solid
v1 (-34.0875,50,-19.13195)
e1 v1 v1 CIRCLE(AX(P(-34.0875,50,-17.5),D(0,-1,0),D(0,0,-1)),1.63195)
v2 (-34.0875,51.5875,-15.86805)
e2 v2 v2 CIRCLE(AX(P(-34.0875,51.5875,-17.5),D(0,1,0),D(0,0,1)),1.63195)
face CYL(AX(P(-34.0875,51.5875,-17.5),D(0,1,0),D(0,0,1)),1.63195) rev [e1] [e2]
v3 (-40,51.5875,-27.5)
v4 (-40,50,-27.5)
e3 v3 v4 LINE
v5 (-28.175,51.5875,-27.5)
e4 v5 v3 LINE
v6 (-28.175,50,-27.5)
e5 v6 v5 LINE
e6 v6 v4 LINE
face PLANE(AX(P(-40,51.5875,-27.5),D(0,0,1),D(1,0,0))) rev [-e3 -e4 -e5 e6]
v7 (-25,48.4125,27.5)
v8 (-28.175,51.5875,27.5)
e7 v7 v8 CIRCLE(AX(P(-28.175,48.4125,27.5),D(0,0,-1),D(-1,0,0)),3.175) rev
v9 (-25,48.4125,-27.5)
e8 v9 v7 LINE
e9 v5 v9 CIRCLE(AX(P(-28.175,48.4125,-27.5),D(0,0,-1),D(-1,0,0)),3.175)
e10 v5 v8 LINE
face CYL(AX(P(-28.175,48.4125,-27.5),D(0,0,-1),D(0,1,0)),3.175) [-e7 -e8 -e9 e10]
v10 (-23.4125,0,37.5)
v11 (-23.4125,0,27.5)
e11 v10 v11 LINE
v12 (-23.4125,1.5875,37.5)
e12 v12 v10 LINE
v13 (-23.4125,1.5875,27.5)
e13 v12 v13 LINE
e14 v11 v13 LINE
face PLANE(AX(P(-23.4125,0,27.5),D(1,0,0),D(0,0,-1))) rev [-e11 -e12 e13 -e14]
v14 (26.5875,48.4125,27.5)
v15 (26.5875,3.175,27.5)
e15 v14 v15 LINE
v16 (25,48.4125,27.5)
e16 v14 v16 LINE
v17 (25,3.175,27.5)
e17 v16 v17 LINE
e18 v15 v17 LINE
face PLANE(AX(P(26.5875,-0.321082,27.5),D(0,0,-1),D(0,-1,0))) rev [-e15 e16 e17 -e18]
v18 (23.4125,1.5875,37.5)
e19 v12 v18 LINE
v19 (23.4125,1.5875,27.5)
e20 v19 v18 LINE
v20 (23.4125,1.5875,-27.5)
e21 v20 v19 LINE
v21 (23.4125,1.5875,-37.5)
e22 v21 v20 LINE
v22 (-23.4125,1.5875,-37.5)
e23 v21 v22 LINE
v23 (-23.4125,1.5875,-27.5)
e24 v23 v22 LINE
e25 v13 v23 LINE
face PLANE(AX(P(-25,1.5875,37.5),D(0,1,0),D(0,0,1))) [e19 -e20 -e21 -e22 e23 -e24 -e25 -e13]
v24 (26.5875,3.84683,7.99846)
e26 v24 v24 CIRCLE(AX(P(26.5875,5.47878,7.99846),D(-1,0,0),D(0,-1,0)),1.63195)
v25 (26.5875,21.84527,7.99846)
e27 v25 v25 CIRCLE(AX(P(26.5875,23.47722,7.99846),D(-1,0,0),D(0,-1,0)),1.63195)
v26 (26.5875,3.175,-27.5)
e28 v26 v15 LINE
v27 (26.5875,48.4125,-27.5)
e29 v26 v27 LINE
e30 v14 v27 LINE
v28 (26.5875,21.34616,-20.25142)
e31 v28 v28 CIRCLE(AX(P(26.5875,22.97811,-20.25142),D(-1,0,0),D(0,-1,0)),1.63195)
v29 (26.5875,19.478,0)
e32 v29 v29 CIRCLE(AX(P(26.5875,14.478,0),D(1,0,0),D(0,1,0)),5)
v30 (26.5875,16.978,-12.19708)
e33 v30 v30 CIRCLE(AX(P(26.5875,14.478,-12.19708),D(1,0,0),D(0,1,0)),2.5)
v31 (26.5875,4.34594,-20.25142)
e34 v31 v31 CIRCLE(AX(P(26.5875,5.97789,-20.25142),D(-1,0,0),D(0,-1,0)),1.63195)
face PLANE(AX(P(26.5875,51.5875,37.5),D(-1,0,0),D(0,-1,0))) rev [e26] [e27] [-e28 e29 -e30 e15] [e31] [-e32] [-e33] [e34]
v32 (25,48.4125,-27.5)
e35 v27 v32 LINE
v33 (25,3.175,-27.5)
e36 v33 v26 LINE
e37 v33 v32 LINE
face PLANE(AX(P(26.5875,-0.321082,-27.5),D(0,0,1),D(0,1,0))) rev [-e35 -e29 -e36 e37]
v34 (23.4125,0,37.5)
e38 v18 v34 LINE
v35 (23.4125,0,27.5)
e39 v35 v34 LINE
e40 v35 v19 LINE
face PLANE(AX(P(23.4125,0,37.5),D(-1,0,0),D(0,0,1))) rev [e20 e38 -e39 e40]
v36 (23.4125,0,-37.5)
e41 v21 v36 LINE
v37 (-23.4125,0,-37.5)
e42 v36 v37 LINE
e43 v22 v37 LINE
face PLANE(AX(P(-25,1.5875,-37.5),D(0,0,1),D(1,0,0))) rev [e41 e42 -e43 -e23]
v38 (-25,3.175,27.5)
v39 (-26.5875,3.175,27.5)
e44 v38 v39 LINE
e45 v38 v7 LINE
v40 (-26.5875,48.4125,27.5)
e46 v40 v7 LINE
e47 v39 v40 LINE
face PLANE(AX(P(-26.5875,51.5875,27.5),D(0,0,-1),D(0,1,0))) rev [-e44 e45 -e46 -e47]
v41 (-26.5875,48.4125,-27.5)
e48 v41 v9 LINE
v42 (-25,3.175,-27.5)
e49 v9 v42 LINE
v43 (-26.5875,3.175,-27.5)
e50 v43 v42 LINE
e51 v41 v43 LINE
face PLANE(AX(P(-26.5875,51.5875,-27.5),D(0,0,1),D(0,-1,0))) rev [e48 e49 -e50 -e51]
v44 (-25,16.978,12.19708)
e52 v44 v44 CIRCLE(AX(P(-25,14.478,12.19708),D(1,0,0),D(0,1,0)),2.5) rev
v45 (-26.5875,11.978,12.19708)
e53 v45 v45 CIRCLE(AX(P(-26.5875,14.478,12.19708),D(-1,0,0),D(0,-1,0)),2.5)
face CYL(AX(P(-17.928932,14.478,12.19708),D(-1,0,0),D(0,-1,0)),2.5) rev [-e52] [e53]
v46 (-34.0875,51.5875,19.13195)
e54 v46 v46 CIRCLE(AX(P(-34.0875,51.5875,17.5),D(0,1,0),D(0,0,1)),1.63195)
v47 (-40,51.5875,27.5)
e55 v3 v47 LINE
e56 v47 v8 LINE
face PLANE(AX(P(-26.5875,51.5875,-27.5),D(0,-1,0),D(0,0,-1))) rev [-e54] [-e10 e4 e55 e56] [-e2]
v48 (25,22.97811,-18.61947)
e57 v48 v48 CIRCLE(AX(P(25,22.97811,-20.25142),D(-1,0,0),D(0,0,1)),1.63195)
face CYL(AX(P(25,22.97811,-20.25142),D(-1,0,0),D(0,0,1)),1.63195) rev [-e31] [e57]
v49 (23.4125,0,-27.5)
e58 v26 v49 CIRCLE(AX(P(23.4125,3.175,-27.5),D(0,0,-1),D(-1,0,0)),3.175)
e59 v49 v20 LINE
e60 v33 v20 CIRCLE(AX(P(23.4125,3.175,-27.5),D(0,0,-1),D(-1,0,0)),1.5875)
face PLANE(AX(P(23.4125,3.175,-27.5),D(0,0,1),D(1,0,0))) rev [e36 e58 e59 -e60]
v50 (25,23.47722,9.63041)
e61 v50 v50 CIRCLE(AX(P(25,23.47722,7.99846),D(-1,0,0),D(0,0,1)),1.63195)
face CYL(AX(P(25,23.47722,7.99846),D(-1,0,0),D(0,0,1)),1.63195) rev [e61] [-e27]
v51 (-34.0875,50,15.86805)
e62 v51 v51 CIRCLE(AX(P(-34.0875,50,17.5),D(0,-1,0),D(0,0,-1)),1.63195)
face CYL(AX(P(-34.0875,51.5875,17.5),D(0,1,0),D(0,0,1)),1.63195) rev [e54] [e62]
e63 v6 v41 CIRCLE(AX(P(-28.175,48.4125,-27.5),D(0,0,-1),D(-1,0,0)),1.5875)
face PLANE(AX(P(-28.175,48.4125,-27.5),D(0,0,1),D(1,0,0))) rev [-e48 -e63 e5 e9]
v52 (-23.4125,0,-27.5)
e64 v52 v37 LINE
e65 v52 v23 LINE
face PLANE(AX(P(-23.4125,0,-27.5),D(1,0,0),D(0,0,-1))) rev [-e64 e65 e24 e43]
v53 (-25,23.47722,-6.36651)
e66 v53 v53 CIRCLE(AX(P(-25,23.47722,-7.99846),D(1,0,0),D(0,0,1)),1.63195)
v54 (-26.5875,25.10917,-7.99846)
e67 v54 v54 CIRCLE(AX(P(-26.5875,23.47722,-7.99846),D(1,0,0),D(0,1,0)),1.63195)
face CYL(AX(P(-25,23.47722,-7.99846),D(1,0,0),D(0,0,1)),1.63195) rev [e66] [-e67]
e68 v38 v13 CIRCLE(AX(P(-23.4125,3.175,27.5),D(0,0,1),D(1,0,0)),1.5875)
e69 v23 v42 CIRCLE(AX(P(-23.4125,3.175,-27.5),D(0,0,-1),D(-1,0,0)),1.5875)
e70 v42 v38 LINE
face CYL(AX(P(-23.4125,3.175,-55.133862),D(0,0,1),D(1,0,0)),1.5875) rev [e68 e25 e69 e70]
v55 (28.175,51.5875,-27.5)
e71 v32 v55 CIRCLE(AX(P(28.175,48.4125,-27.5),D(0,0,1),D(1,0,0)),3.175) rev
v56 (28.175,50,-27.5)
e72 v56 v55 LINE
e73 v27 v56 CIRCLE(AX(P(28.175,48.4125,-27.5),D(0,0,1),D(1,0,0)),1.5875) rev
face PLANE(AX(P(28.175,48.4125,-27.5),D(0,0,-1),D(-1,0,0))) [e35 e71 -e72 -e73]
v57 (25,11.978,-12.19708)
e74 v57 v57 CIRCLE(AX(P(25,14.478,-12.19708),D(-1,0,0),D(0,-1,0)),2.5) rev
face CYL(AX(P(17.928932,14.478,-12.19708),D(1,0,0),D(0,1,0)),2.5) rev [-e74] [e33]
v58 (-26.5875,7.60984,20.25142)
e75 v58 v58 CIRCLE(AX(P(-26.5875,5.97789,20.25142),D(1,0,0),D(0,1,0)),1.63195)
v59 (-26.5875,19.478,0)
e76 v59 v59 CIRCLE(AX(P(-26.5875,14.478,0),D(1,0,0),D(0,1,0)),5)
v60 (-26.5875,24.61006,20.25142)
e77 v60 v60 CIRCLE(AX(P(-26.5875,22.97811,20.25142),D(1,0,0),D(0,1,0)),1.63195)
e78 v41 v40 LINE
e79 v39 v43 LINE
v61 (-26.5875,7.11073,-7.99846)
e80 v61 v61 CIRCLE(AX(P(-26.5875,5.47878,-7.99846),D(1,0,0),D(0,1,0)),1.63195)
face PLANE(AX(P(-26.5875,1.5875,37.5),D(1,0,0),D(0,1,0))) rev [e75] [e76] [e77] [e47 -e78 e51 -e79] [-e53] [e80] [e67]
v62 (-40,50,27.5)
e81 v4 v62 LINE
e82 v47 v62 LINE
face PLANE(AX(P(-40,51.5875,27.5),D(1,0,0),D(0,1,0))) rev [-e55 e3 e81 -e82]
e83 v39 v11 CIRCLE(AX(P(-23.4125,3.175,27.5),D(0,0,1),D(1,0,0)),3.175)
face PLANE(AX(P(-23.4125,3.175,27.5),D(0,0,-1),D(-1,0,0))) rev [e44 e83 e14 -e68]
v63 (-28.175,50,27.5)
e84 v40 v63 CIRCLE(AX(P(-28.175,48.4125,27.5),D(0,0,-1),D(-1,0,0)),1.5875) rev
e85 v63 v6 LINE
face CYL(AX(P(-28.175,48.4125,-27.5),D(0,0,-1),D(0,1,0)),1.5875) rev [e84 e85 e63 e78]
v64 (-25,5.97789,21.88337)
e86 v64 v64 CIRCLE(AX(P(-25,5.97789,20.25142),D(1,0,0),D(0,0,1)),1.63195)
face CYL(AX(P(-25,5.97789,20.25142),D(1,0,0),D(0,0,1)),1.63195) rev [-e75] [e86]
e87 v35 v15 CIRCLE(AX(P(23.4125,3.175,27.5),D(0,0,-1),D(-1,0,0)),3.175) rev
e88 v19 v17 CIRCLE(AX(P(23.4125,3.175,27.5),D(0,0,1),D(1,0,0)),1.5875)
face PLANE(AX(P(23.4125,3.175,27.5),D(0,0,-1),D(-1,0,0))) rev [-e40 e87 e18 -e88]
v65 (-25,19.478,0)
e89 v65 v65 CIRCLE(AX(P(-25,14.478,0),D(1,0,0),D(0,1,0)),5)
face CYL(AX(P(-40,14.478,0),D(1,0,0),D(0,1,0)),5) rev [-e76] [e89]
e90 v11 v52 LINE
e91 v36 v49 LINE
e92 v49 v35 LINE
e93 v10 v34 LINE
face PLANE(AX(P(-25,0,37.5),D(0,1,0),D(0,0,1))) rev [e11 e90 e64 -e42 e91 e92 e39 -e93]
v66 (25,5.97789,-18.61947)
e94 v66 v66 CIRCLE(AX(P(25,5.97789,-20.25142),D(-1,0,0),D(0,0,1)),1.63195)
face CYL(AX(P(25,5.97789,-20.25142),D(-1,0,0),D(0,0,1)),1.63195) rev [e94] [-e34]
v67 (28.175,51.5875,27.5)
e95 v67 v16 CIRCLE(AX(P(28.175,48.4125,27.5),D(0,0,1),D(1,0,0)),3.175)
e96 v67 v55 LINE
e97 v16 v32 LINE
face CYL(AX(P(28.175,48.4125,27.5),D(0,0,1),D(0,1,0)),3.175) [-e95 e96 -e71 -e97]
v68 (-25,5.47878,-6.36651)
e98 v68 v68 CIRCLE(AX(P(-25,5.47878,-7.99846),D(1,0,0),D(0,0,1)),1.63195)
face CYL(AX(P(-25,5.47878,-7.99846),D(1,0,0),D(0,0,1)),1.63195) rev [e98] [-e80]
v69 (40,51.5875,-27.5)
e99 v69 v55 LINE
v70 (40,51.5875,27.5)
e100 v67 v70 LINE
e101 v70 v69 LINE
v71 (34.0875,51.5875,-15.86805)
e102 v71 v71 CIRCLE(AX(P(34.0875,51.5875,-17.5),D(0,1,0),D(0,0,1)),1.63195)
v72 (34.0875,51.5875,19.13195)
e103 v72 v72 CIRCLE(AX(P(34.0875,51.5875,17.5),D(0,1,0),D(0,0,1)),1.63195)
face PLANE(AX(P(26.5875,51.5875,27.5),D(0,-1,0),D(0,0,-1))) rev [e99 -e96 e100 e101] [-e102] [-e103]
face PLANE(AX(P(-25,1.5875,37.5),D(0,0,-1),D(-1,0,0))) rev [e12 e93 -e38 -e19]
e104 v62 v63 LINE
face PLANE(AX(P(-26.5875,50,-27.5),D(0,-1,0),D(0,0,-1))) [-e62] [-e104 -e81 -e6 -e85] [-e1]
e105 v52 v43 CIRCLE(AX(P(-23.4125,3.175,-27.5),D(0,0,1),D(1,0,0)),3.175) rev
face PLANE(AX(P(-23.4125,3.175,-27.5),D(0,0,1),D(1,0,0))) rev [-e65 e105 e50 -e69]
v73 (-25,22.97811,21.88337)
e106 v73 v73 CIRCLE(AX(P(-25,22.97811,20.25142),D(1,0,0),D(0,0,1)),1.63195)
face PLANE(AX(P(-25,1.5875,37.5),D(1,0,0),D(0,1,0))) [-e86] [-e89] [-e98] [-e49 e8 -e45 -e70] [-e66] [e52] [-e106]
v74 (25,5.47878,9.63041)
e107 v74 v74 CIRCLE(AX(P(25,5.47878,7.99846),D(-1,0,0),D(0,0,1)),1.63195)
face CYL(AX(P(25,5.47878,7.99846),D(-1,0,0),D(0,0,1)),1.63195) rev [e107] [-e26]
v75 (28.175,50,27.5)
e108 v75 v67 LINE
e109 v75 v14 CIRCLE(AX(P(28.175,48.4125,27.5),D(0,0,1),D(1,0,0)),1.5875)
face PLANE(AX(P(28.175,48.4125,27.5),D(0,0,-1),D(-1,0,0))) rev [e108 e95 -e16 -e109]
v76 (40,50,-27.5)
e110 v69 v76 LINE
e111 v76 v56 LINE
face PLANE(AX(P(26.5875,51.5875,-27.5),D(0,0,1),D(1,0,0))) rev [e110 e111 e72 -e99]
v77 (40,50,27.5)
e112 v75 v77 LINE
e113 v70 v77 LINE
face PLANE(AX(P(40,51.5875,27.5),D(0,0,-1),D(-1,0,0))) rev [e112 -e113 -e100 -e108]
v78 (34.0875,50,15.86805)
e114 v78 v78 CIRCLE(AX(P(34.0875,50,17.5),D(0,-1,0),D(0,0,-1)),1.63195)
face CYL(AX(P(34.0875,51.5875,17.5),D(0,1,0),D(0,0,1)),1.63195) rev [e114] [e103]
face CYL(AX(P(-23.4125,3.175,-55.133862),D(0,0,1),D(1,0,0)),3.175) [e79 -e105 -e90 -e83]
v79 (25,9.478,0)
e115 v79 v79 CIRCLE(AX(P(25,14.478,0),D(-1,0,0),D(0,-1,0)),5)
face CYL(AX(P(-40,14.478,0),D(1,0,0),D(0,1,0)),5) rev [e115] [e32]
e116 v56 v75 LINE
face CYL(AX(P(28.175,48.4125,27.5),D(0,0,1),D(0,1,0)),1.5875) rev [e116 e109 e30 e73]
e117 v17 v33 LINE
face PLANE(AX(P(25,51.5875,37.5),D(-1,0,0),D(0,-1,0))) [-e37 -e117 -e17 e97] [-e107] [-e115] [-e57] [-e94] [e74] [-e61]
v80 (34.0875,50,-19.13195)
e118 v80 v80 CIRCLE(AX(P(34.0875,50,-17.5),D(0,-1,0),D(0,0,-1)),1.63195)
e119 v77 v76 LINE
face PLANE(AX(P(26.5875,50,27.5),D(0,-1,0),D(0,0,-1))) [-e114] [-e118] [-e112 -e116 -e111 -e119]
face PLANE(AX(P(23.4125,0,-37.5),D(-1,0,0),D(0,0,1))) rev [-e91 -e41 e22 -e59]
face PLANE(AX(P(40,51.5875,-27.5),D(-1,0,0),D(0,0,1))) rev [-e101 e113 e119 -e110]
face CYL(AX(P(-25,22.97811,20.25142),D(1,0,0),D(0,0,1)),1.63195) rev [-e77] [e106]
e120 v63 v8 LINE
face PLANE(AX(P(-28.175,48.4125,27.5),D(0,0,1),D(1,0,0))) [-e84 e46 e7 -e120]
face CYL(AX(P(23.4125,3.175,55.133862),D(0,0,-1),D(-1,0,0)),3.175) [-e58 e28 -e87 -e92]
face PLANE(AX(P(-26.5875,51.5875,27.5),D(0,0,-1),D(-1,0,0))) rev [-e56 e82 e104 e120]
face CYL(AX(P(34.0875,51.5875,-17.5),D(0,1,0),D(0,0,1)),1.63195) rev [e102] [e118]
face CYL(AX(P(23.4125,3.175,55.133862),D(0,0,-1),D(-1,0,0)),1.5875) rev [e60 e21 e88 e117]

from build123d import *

# Parameters (mm, degrees)
SKETCH1_W                    = 50
SKETCH1_H                    = 75
BASE_FLANGE3_DEPTH           = 1.5875
EDGE_FLANGE1_STRIP_W         = 9.525
EDGE_FLANGE1_STRIP_H         = 1.5875
EDGE_FLANGE1_STRIP_CUT_DEPTH = 75
EDGE_FLANGE1_DEPTH           = 75
EDGE_FLANGE2_STRIP_W         = 9.525
EDGE_FLANGE2_STRIP_H         = 1.5875
EDGE_FLANGE2_STRIP_CUT_DEPTH = 75
EDGE_FLANGE2_DEPTH           = 75
UNFOLD1_START                = -37.5
UNFOLD1_DEPTH                = 75
UNFOLD1_2_DEPTH              = 75
SKETCH36_W                   = 51.908582115
SKETCH36_H                   = 10
EXTRUDE1_DEPTH               = 85.15483092
FOLD1_START                  = -27.5
FOLD1_DEPTH                  = 55
FOLD1_2_DEPTH                = 55
EDGE_FLANGE4_STRIP_W         = 9.525
EDGE_FLANGE4_STRIP_H         = 1.5875
EDGE_FLANGE4_STRIP_CUT_DEPTH = 55
EDGE_FLANGE4_DEPTH           = 55
EDGE_FLANGE5_STRIP_W         = 9.525
EDGE_FLANGE5_STRIP_H         = 1.5875
EDGE_FLANGE5_STRIP_CUT_DEPTH = 55
EDGE_FLANGE5_DEPTH           = 55
F_4_CLEARANCE_HOLE1_D        = 3.2639
SKETCH31_R                   = 5
OUTPUT_SHAFT_CLEARANCE_DEPTH = 93.203119863
SKETCH49_R                   = 2.5
NIPPLE_CLEARANCE_1_DEPTH     = 1.5875
SKETCH50_R                   = 2.5
CUT_EXTRUDE2_DEPTH           = 1.5875
UNFOLD2_START                = -40
UNFOLD2_OUTLINE_W            = 50
UNFOLD2_OUTLINE_H            = 55
UNFOLD2_OUTLINE_R            = 5
UNFOLD2_DEPTH                = 80
UNFOLD2_START_2              = -72.146082115
UNFOLD2_2_OUTLINE_W          = 1.5875
UNFOLD2_2_OUTLINE_H          = 55
UNFOLD2_2_DEPTH              = 28.9344999
UNFOLD2_START_3              = 43.211582215
UNFOLD2_3_OUTLINE_W          = 1.5875
UNFOLD2_3_OUTLINE_H          = 55
UNFOLD2_3_DEPTH              = 28.9344999
UNFOLD2_START_4              = -33.211582015
UNFOLD2_4_OUTLINE_W          = 1.5875
UNFOLD2_4_OUTLINE_H          = 55
UNFOLD2_4_DEPTH              = 66.42316403
UNFOLD2_START_5              = -75.321082115
UNFOLD2_5_OUTLINE_W          = 15
UNFOLD2_5_OUTLINE_H          = 55
UNFOLD2_5_OUTLINE_R          = 1.63195
UNFOLD2_5_DEPTH              = 3.175
UNFOLD2_START_6              = 72.146082115
UNFOLD2_6_OUTLINE_W          = 15
UNFOLD2_6_OUTLINE_H          = 55
UNFOLD2_6_OUTLINE_R          = 1.63195
UNFOLD2_6_DEPTH              = 3.175
UNFOLD2_START_7              = -43.211582215
UNFOLD2_7_OUTLINE_W          = 1.5875
UNFOLD2_7_OUTLINE_H          = 55
UNFOLD2_7_DEPTH              = 86.42316443
UNFOLD2_START_8              = -27.5
UNFOLD2_8_DEPTH              = 55
UNFOLD2_START_9              = -1
UNFOLD2_9_OUTLINE_R          = 5
UNFOLD2_9_OUTLINE_R_2        = 2.5
UNFOLD2_9_DEPTH              = 4
F_4_CLEARANCE_HOLE4_D        = 3.2639
F_4_CLEARANCE_HOLE4_DEPTH    = 3.18
F_4_CLEARANCE_HOLE4_TIP      = 0.980574487
FLAT_PATTERN3_START          = -27.5
FLAT_PATTERN3_DEPTH          = 55
FLAT_PATTERN3_2_DEPTH        = 55


with BuildPart() as part:
    # Base-Flange3: sheet metal written as solids
    # Sketch1 → Base-Flange3 (new body)
    with BuildSketch(Plane(origin=(0, 0, 0), x_dir=(1, 0, 0), z_dir=(0, 1, 0))):
        Rectangle(SKETCH1_W, SKETCH1_H)
    extrude(amount=BASE_FLANGE3_DEPTH)

    # Edge-Flange1: sheet metal written as solids
    # Edge-Flange1 strip (on a plane across the edge) → Edge-Flange1 strip cut (cut)
    with BuildSketch(Plane(origin=(-25, 1.5875, -37.5), x_dir=(1, 0, 0), z_dir=(0, 0, 1))):
        with Locations((-3.175, -0.79375)):
            Rectangle(EDGE_FLANGE1_STRIP_W, EDGE_FLANGE1_STRIP_H)
    extrude(amount=EDGE_FLANGE1_STRIP_CUT_DEPTH, mode=Mode.SUBTRACT)

    # Edge-Flange1 section (on a plane across the edge) → Edge-Flange1 (add)
    with BuildSketch(Plane(origin=(-25, 1.5875, -37.5), x_dir=(1, 0, 0), z_dir=(0, 0, 1))):
        with BuildLine():
            Line((-1.5875, 1.5875), (-1.5875, 50))
            Line((-1.5875, 50), (0, 50))
            Line((0, 50), (0, 1.5875))
            ThreePointArc((0, 1.5875), (0.464967985, 0.464967985), (1.5875, 0))
            Line((1.5875, 0), (1.5875, -1.5875))
            ThreePointArc((1.5875, -1.5875), (-0.65756403, -0.65756403), (-1.5875, 1.5875))
        make_face()
    extrude(amount=EDGE_FLANGE1_DEPTH)

    # Edge-Flange2: sheet metal written as solids
    # Edge-Flange2 strip (on a plane across the edge) → Edge-Flange2 strip cut (cut)
    with BuildSketch(Plane(origin=(25, 1.5875, 37.5), x_dir=(-1, 0, 0), z_dir=(0, 0, -1))):
        with Locations((-3.175, -0.79375)):
            Rectangle(EDGE_FLANGE2_STRIP_W, EDGE_FLANGE2_STRIP_H)
    extrude(amount=EDGE_FLANGE2_STRIP_CUT_DEPTH, mode=Mode.SUBTRACT)

    # Edge-Flange2 section (on a plane across the edge) → Edge-Flange2 (add)
    with BuildSketch(Plane(origin=(25, 1.5875, 37.5), x_dir=(-1, 0, 0), z_dir=(0, 0, -1))):
        with BuildLine():
            Line((-1.5875, 1.5875), (-1.5875, 50))
            Line((-1.5875, 50), (0, 50))
            Line((0, 50), (0, 1.5875))
            ThreePointArc((0, 1.5875), (0.464967985, 0.464967985), (1.5875, 0))
            Line((1.5875, 0), (1.5875, -1.5875))
            ThreePointArc((1.5875, -1.5875), (-0.65756403, -0.65756403), (-1.5875, 1.5875))
        make_face()
    extrude(amount=EDGE_FLANGE2_DEPTH)

    # Unfold1: read off the stored shape, not the designer's step
    # Unfold1 outline → Unfold1 (cut)
    with BuildSketch(Plane.XY.offset(UNFOLD1_START)):
        with BuildLine():
            Line((-26.162130657, 1.5875), (-23.4125, 1.5875))
            ThreePointArc((-23.4125, 1.5875), (-24.535032015, 2.052467985), (-25, 3.175))
            Line((-25, 3.175), (-25, 51.5875))
            Line((-25, 51.5875), (-26.5875, 51.5875))
            Line((-26.5875, 51.5875), (-26.5875, 3.175))
            ThreePointArc((-26.5875, 3.175), (-26.479314498, 2.353249532), (-26.162130657, 1.5875))
        make_face()
        with BuildLine():
            Line((23.4125, 1.5875), (26.162130657, 1.5875))
            ThreePointArc((26.162130657, 1.5875), (26.479314498, 2.353249532), (26.5875, 3.175))
            Line((26.5875, 3.175), (26.5875, 51.5875))
            Line((26.5875, 51.5875), (25, 51.5875))
            Line((25, 51.5875), (25, 3.175))
            ThreePointArc((25, 3.175), (24.535032015, 2.052467985), (23.4125, 1.5875))
        make_face()
    extrude(amount=UNFOLD1_DEPTH, mode=Mode.SUBTRACT)

    # Unfold1 2 outline → Unfold1 2 (add)
    with BuildSketch(Plane.XY.offset(UNFOLD1_START)):
        with BuildLine():
            ThreePointArc((-23.4125, 0), (-25, 0.425369343), (-26.162130657, 1.5875))
            Line((-26.162130657, 1.5875), (-75.321082115, 1.5875))
            Line((-75.321082115, 1.5875), (-75.321082115, 0))
            Line((-75.321082115, 0), (-23.4125, 0))
        make_face()
        with BuildLine():
            Line((75.321082115, 1.5875), (26.162130657, 1.5875))
            ThreePointArc((26.162130657, 1.5875), (25, 0.425369343), (23.4125, 0))
            Line((23.4125, 0), (75.321082115, 0))
            Line((75.321082115, 0), (75.321082115, 1.5875))
        make_face()
    extrude(amount=UNFOLD1_2_DEPTH)

    # Sketch36 → Extrude1 (cut, through all)
    with BuildSketch(Plane(origin=(0, 1.5875, 0), x_dir=(1, 0, 0), z_dir=(0, 1, 0))):
        with Locations((-49.366791058, 32.5)):
            Rectangle(SKETCH36_W, SKETCH36_H)
        with Locations((49.366791058, 32.5)):
            Rectangle(SKETCH36_W, SKETCH36_H)
        with Locations((-49.366791058, -32.5)):
            Rectangle(SKETCH36_W, SKETCH36_H)
        with Locations((49.366791058, -32.5)):
            Rectangle(SKETCH36_W, SKETCH36_H)
    extrude(amount=-EXTRUDE1_DEPTH, mode=Mode.SUBTRACT)

    # Fold1: read off the stored shape, not the designer's step
    # Fold1 outline → Fold1 (cut)
    with BuildSketch(Plane.XY.offset(FOLD1_START)):
        with BuildLine():
            ThreePointArc((-23.4125, 0), (-25, 0.425369343), (-26.162130657, 1.5875))
            Line((-26.162130657, 1.5875), (-75.321082115, 1.5875))
            Line((-75.321082115, 1.5875), (-75.321082115, 0))
            Line((-75.321082115, 0), (-23.4125, 0))
        make_face()
        with BuildLine():
            Line((75.321082115, 1.5875), (26.162130657, 1.5875))
            ThreePointArc((26.162130657, 1.5875), (25, 0.425369343), (23.4125, 0))
            Line((23.4125, 0), (75.321082115, 0))
            Line((75.321082115, 0), (75.321082115, 1.5875))
        make_face()
    extrude(amount=FOLD1_DEPTH, mode=Mode.SUBTRACT)

    # Fold1 2 outline → Fold1 2 (add)
    with BuildSketch(Plane.XY.offset(FOLD1_START)):
        with BuildLine():
            ThreePointArc((-23.4125, 1.5875), (-24.535032015, 2.052467985), (-25, 3.175))
            Line((-25, 3.175), (-25, 51.5875))
            Line((-25, 51.5875), (-26.5875, 51.5875))
            Line((-26.5875, 51.5875), (-26.5875, 3.175))
            ThreePointArc((-26.5875, 3.175), (-26.479314498, 2.353249532), (-26.162130657, 1.5875))
            Line((-26.162130657, 1.5875), (-23.4125, 1.5875))
        make_face()
        with BuildLine():
            Line((26.5875, 51.5875), (25, 51.5875))
            Line((25, 51.5875), (25, 3.175))
            ThreePointArc((25, 3.175), (24.535032015, 2.052467985), (23.4125, 1.5875))
            Line((23.4125, 1.5875), (26.162130657, 1.5875))
            ThreePointArc((26.162130657, 1.5875), (26.479314498, 2.353249532), (26.5875, 3.175))
            Line((26.5875, 3.175), (26.5875, 51.5875))
        make_face()
    extrude(amount=FOLD1_2_DEPTH)

    # Edge-Flange4: sheet metal written as solids
    # Edge-Flange4 strip (on a plane across the edge) → Edge-Flange4 strip cut (cut)
    with BuildSketch(Plane(origin=(-26.5875, 51.5875, 27.5), x_dir=(0, -1, 0), z_dir=(0, 0, -1))):
        with Locations((-1.5875, -0.79375)):
            Rectangle(EDGE_FLANGE4_STRIP_W, EDGE_FLANGE4_STRIP_H)
    extrude(amount=EDGE_FLANGE4_STRIP_CUT_DEPTH, mode=Mode.SUBTRACT)

    # Edge-Flange4 section (on a plane across the edge) → Edge-Flange4 (add)
    with BuildSketch(Plane(origin=(-26.5875, 51.5875, 27.5), x_dir=(0, -1, 0), z_dir=(0, 0, -1))):
        with BuildLine():
            Line((0, 1.5875), (0, 13.4125))
            Line((0, 13.4125), (1.5875, 13.4125))
            Line((1.5875, 13.4125), (1.5875, 1.5875))
            ThreePointArc((1.5875, 1.5875), (2.052467985, 0.464967985), (3.175, 0))
            Line((3.175, 0), (3.175, -1.5875))
            ThreePointArc((3.175, -1.5875), (0.92993597, -0.65756403), (0, 1.5875))
        make_face()
    extrude(amount=EDGE_FLANGE4_DEPTH)

    # Edge-Flange5: sheet metal written as solids
    # Edge-Flange5 strip (on a plane across the edge) → Edge-Flange5 strip cut (cut)
    with BuildSketch(Plane(origin=(26.5875, 51.5875, -27.5), x_dir=(0, -1, 0), z_dir=(0, 0, 1))):
        with Locations((-1.5875, -0.79375)):
            Rectangle(EDGE_FLANGE5_STRIP_W, EDGE_FLANGE5_STRIP_H)
    extrude(amount=EDGE_FLANGE5_STRIP_CUT_DEPTH, mode=Mode.SUBTRACT)

    # Edge-Flange5 section (on a plane across the edge) → Edge-Flange5 (add)
    with BuildSketch(Plane(origin=(26.5875, 51.5875, -27.5), x_dir=(0, -1, 0), z_dir=(0, 0, 1))):
        with BuildLine():
            Line((0, 1.5875), (0, 13.4125))
            Line((0, 13.4125), (1.5875, 13.4125))
            Line((1.5875, 13.4125), (1.5875, 1.5875))
            ThreePointArc((1.5875, 1.5875), (2.052467985, 0.464967985), (3.175, 0))
            Line((3.175, 0), (3.175, -1.5875))
            ThreePointArc((3.175, -1.5875), (0.92993597, -0.65756403), (0, 1.5875))
        make_face()
    extrude(amount=EDGE_FLANGE5_DEPTH)

    # #4 Clearance Hole1 (through all)
    with Locations(Plane(origin=(0, 51.5875, 0), x_dir=(-1, 0, 0), z_dir=(0, 1, 0))):
        with Locations((34.0875, -17.5), (34.0875, 17.5), (-34.0875, -17.5), (-34.0875, 17.5)):
            Hole(F_4_CLEARANCE_HOLE1_D / 2)

    # Sketch31 → Output shaft clearance (cut, through all)
    with BuildSketch(Plane(origin=(26.5875, 0, 0), x_dir=(0, 0, -1), z_dir=(1, 0, 0))):
        with Locations(Location((0, 14.478, 0), (0, 0, 90))):
            Circle(SKETCH31_R)
    extrude(amount=-OUTPUT_SHAFT_CLEARANCE_DEPTH, mode=Mode.SUBTRACT)

    # Sketch49 → Nipple Clearance 1 (cut)
    with BuildSketch(Plane(origin=(26.5875, 0, 0), x_dir=(0, 0, -1), z_dir=(1, 0, 0))):
        with Locations(Location((12.19708, 14.478, 0), (0, 0, 90))):
            Circle(SKETCH49_R)
    extrude(amount=-NIPPLE_CLEARANCE_1_DEPTH, mode=Mode.SUBTRACT)

    # Sketch50 → Cut-Extrude2 (cut)
    with BuildSketch(Plane.ZY.offset(26.5875)):
        with Locations(Location((12.19708, 14.478, 0), (0, 0, 270))):
            Circle(SKETCH50_R)
    extrude(amount=-CUT_EXTRUDE2_DEPTH, mode=Mode.SUBTRACT)

    # Unfold2: read off the stored shape, not the designer's step
    # Unfold2 outline → Unfold2 (cut)
    with BuildSketch(Plane.YZ.offset(UNFOLD2_START)):
        with Locations((26.5875, 0)):
            Rectangle(UNFOLD2_OUTLINE_W, UNFOLD2_OUTLINE_H)
        with Locations((14.478, 0)):
            Circle(UNFOLD2_OUTLINE_R, mode=Mode.SUBTRACT)
    extrude(amount=UNFOLD2_DEPTH, mode=Mode.SUBTRACT)

    # Unfold2 4 outline → Unfold2 4 (add)
    with BuildSketch(Plane.YZ.offset(UNFOLD2_START_4)):
        with Locations((0.79375, 0)):
            Rectangle(UNFOLD2_4_OUTLINE_W, UNFOLD2_4_OUTLINE_H)
    extrude(amount=UNFOLD2_4_DEPTH)



with BuildPart() as body_2:
    # Unfold2 2 outline → Unfold2 2 (new body)
    with BuildSketch(Plane.YZ.offset(UNFOLD2_START_2)):
        with Locations((0.79375, 0)):
            Rectangle(UNFOLD2_2_OUTLINE_W, UNFOLD2_2_OUTLINE_H)
    extrude(amount=UNFOLD2_2_DEPTH)

    # Unfold2 5 outline → Unfold2 5 (add)
    with BuildSketch(Plane.YZ.offset(UNFOLD2_START_5)):
        with Locations((-5.9125, 0)):
            Rectangle(UNFOLD2_5_OUTLINE_W, UNFOLD2_5_OUTLINE_H)
        with Locations((-7.5, 17.5)):
            Circle(UNFOLD2_5_OUTLINE_R, mode=Mode.SUBTRACT)
        with Locations((-7.5, -17.5)):
            Circle(UNFOLD2_5_OUTLINE_R, mode=Mode.SUBTRACT)
    extrude(amount=UNFOLD2_5_DEPTH)


with BuildPart() as body_3:
    # Unfold2 3 outline → Unfold2 3 (new body)
    with BuildSketch(Plane.YZ.offset(UNFOLD2_START_3)):
        with Locations((0.79375, 0)):
            Rectangle(UNFOLD2_3_OUTLINE_W, UNFOLD2_3_OUTLINE_H)
    extrude(amount=UNFOLD2_3_DEPTH)

    # Unfold2 6 outline → Unfold2 6 (add)
    with BuildSketch(Plane.YZ.offset(UNFOLD2_START_6)):
        with Locations((-5.9125, 0)):
            Rectangle(UNFOLD2_6_OUTLINE_W, UNFOLD2_6_OUTLINE_H)
        with Locations((-7.5, 17.5)):
            Circle(UNFOLD2_6_OUTLINE_R, mode=Mode.SUBTRACT)
        with Locations((-7.5, -17.5)):
            Circle(UNFOLD2_6_OUTLINE_R, mode=Mode.SUBTRACT)
    extrude(amount=UNFOLD2_6_DEPTH)


with BuildPart() as part_1:
    add(part.part)

    add(body_2.part)  # Unfold2 7 merges body 2

    add(body_3.part)  # Unfold2 7 merges body 3
    # Unfold2 7 outline → Unfold2 7 (add)
    with BuildSketch(Plane.YZ.offset(UNFOLD2_START_7)):
        with Locations((0.79375, 0)):
            Rectangle(UNFOLD2_7_OUTLINE_W, UNFOLD2_7_OUTLINE_H)
    extrude(amount=UNFOLD2_7_DEPTH)

    # Unfold2 8 outline → Unfold2 8 (cut)
    with BuildSketch(Plane.XY.offset(UNFOLD2_START_8)):
        with BuildLine():
            Line((-73.733582115, -1.5875), (-73.733582115, -13.4125))
            Line((-73.733582115, -13.4125), (-72.146082115, -13.4125))
            Line((-72.146082115, -13.4125), (-72.146082115, 0))
            ThreePointArc((-72.146082115, 0), (-73.26861413, -0.464967985), (-73.733582115, -1.5875))
        make_face()
        with BuildLine():
            Line((-75.321082115, 1.5875), (-75.321082115, -1.5875))
            ThreePointArc((-75.321082115, -1.5875), (-74.391146145, 0.65756403), (-72.146082115, 1.5875))
            Line((-72.146082115, 1.5875), (-75.321082115, 1.5875))
        make_face()
        with BuildLine():
            ThreePointArc((73.733582115, -1.5875), (73.26861413, -0.464967985), (72.146082115, 0))
            Line((72.146082115, 0), (72.146082115, -13.4125))
            Line((72.146082115, -13.4125), (73.733582115, -13.4125))
            Line((73.733582115, -13.4125), (73.733582115, -1.5875))
        make_face()
        with BuildLine():
            Line((75.321082115, 1.5875), (72.146082115, 1.5875))
            ThreePointArc((72.146082115, 1.5875), (74.391146145, 0.65756403), (75.321082115, -1.5875))
            Line((75.321082115, -1.5875), (75.321082115, 1.5875))
        make_face()
    extrude(amount=UNFOLD2_8_DEPTH, mode=Mode.SUBTRACT)

    # Unfold2 9 outline → Unfold2 9 (cut)
    with BuildSketch(Plane(origin=(0, 0, 0), x_dir=(1, 0, 0), z_dir=(0, 1, 0)).offset(UNFOLD2_START_9)):
        with Locations((-38.211582115, 0)):
            Circle(UNFOLD2_9_OUTLINE_R)
        with Locations((-38.211582115, -12.19708)):
            Circle(UNFOLD2_9_OUTLINE_R_2)
        with Locations((38.211582115, 0)):
            Circle(UNFOLD2_9_OUTLINE_R)
        with Locations((38.211582115, 12.19708)):
            Circle(UNFOLD2_9_OUTLINE_R_2)
    extrude(amount=UNFOLD2_9_DEPTH, mode=Mode.SUBTRACT)

    # #4 Clearance Hole4
    with Locations(Plane(origin=(0, 1.5875, 0), x_dir=(-1, 0, 0), z_dir=(0, 1, 0))):
        with Locations((29.212362115, -7.99846), (29.711472115, 20.25142), (46.711692115, 20.25142), (47.210802115, -7.99846), (-29.711472115, -20.25142), (-46.711692115, -20.25142), (-47.210802115, 7.99846), (-29.212362115, 7.99846)):
            Hole(F_4_CLEARANCE_HOLE4_D / 2, depth=F_4_CLEARANCE_HOLE4_DEPTH)
            with Locations((0, 0, -(F_4_CLEARANCE_HOLE4_DEPTH + F_4_CLEARANCE_HOLE4_TIP / 2))):  # 118° drill point
                Cone(0, F_4_CLEARANCE_HOLE4_D / 2, F_4_CLEARANCE_HOLE4_TIP, mode=Mode.SUBTRACT)

    # Flat-Pattern3: read off the stored shape, not the designer's step
    # Flat-Pattern3 outline → Flat-Pattern3 (cut)
    with BuildSketch(Plane.XY.offset(FLAT_PATTERN3_START)):
        with BuildLine():
            ThreePointArc((-23.4125, 0), (-25, 0.425369343), (-26.162130657, 1.5875))
            Line((-26.162130657, 1.5875), (-72.146082115, 1.5875))
            ThreePointArc((-72.146082115, 1.5875), (-74.391146145, 0.65756403), (-75.321082115, -1.5875))
            Line((-75.321082115, -1.5875), (-75.321082115, -13.4125))
            Line((-75.321082115, -13.4125), (-73.733582115, -13.4125))
            Line((-73.733582115, -13.4125), (-73.733582115, -1.5875))
            ThreePointArc((-73.733582115, -1.5875), (-73.26861413, -0.464967985), (-72.146082115, 0))
            Line((-72.146082115, 0), (-23.4125, 0))
        make_face()
        with BuildLine():
            Line((72.146082115, 1.5875), (26.162130657, 1.5875))
            ThreePointArc((26.162130657, 1.5875), (25, 0.425369343), (23.4125, 0))
            Line((23.4125, 0), (72.146082115, 0))
            ThreePointArc((72.146082115, 0), (73.26861413, -0.464967985), (73.733582115, -1.5875))
            Line((73.733582115, -1.5875), (73.733582115, -13.4125))
            Line((73.733582115, -13.4125), (75.321082115, -13.4125))
            Line((75.321082115, -13.4125), (75.321082115, -1.5875))
            ThreePointArc((75.321082115, -1.5875), (74.391146145, 0.65756403), (72.146082115, 1.5875))
        make_face()
    extrude(amount=FLAT_PATTERN3_DEPTH, mode=Mode.SUBTRACT)

    # Flat-Pattern3 2 outline → Flat-Pattern3 2 (add)
    with BuildSketch(Plane.XY.offset(FLAT_PATTERN3_START)):
        with BuildLine():
            ThreePointArc((-23.4125, 1.5875), (-24.535032015, 2.052467985), (-25, 3.175))
            Line((-25, 3.175), (-25, 48.4125))
            ThreePointArc((-25, 48.4125), (-25.92993597, 50.65756403), (-28.175, 51.5875))
            Line((-28.175, 51.5875), (-40, 51.5875))
            Line((-40, 51.5875), (-40, 50))
            Line((-40, 50), (-28.175, 50))
            ThreePointArc((-28.175, 50), (-27.052467985, 49.535032015), (-26.5875, 48.4125))
            Line((-26.5875, 48.4125), (-26.5875, 3.175))
            ThreePointArc((-26.5875, 3.175), (-26.479314498, 2.353249532), (-26.162130657, 1.5875))
            Line((-26.162130657, 1.5875), (-23.4125, 1.5875))
        make_face()
        with BuildLine():
            ThreePointArc((26.5875, 48.4125), (27.052467985, 49.535032015), (28.175, 50))
            Line((28.175, 50), (40, 50))
            Line((40, 50), (40, 51.5875))
            Line((40, 51.5875), (28.175, 51.5875))
            ThreePointArc((28.175, 51.5875), (25.92993597, 50.65756403), (25, 48.4125))
            Line((25, 48.4125), (25, 3.175))
            ThreePointArc((25, 3.175), (24.535032015, 2.052467985), (23.4125, 1.5875))
            Line((23.4125, 1.5875), (26.162130657, 1.5875))
            ThreePointArc((26.162130657, 1.5875), (26.479314498, 2.353249532), (26.5875, 3.175))
            Line((26.5875, 3.175), (26.5875, 48.4125))
        make_face()
    extrude(amount=FLAT_PATTERN3_2_DEPTH)

    # Flat-Pattern3 3: loft between two sections, ruled curve by curve
    flat_pattern3_3_from = [
        Edge.make_three_point_arc((-34.0875, 50, 19.13195), (-32.45555, 50, 17.5), (-34.0875, 50, 15.86805)),
        Edge.make_three_point_arc((-34.0875, 50, 15.86805), (-35.71945, 50, 17.5), (-34.0875, 50, 19.13195)),
    ]
    flat_pattern3_3_to = [
        Edge.make_three_point_arc((-34.0875, 51.5875, 19.13195), (-32.45555, 51.5875, 17.5), (-34.0875, 51.5875, 15.86805)),
        Edge.make_three_point_arc((-34.0875, 51.5875, 15.86805), (-35.71945, 51.5875, 17.5), (-34.0875, 51.5875, 19.13195)),
    ]
    flat_pattern3_3 = Solid(Shell([*[Face.make_surface_from_curves(flat_pattern3_3_from[k], flat_pattern3_3_to[k]) for k in range(2)], Face(Wire(flat_pattern3_3_from)), Face(Wire(flat_pattern3_3_to))]))
    add(flat_pattern3_3, mode=Mode.SUBTRACT)

    # Flat-Pattern3 4: loft between two sections, ruled curve by curve
    flat_pattern3_4_from = [
        Edge.make_three_point_arc((-34.0875, 50, -15.86805), (-32.45555, 50, -17.5), (-34.0875, 50, -19.13195)),
        Edge.make_three_point_arc((-34.0875, 50, -19.13195), (-35.71945, 50, -17.5), (-34.0875, 50, -15.86805)),
    ]
    flat_pattern3_4_to = [
        Edge.make_three_point_arc((-34.0875, 51.5875, -15.86805), (-32.45555, 51.5875, -17.5), (-34.0875, 51.5875, -19.13195)),
        Edge.make_three_point_arc((-34.0875, 51.5875, -19.13195), (-35.71945, 51.5875, -17.5), (-34.0875, 51.5875, -15.86805)),
    ]
    flat_pattern3_4 = Solid(Shell([*[Face.make_surface_from_curves(flat_pattern3_4_from[k], flat_pattern3_4_to[k]) for k in range(2)], Face(Wire(flat_pattern3_4_from)), Face(Wire(flat_pattern3_4_to))]))
    add(flat_pattern3_4, mode=Mode.SUBTRACT)

    # Flat-Pattern3 5: loft between two sections, ruled curve by curve
    flat_pattern3_5_from = [
        Edge.make_three_point_arc((-26.5875, 19.478, 0), (-26.5875, 14.478, 5), (-26.5875, 9.478, 0)),
        Edge.make_three_point_arc((-26.5875, 9.478, 0), (-26.5875, 14.478, -5), (-26.5875, 19.478, 0)),
    ]
    flat_pattern3_5_to = [
        Edge.make_three_point_arc((-25, 19.478, 0), (-25, 14.478, 5), (-25, 9.478, 0)),
        Edge.make_three_point_arc((-25, 9.478, 0), (-25, 14.478, -5), (-25, 19.478, 0)),
    ]
    flat_pattern3_5 = Solid(Shell([*[Face.make_surface_from_curves(flat_pattern3_5_from[k], flat_pattern3_5_to[k]) for k in range(2)], Face(Wire(flat_pattern3_5_from)), Face(Wire(flat_pattern3_5_to))]))
    add(flat_pattern3_5, mode=Mode.SUBTRACT)

    # Flat-Pattern3 6: loft between two sections, ruled curve by curve
    flat_pattern3_6_from = [
        Edge.make_three_point_arc((25, 19.478, 0), (25, 14.478, 5), (25, 9.478, 0)),
        Edge.make_three_point_arc((25, 9.478, 0), (25, 14.478, -5), (25, 19.478, 0)),
    ]
    flat_pattern3_6_to = [
        Edge.make_three_point_arc((26.5875, 19.478, 0), (26.5875, 14.478, 5), (26.5875, 9.478, 0)),
        Edge.make_three_point_arc((26.5875, 9.478, 0), (26.5875, 14.478, -5), (26.5875, 19.478, 0)),
    ]
    flat_pattern3_6 = Solid(Shell([*[Face.make_surface_from_curves(flat_pattern3_6_from[k], flat_pattern3_6_to[k]) for k in range(2)], Face(Wire(flat_pattern3_6_from)), Face(Wire(flat_pattern3_6_to))]))
    add(flat_pattern3_6, mode=Mode.SUBTRACT)

    # Flat-Pattern3 7: loft between two sections, ruled curve by curve
    flat_pattern3_7_from = [
        Edge.make_three_point_arc((-25, 11.978, 12.19708), (-25, 14.478, 14.69708), (-25, 16.978, 12.19708)),
        Edge.make_three_point_arc((-25, 16.978, 12.19708), (-25, 14.478, 9.69708), (-25, 11.978, 12.19708)),
    ]
    flat_pattern3_7_to = [
        Edge.make_three_point_arc((-26.5875, 11.978, 12.19708), (-26.5875, 14.478, 14.69708), (-26.5875, 16.978, 12.19708)),
        Edge.make_three_point_arc((-26.5875, 16.978, 12.19708), (-26.5875, 14.478, 9.69708), (-26.5875, 11.978, 12.19708)),
    ]
    flat_pattern3_7 = Solid(Shell([*[Face.make_surface_from_curves(flat_pattern3_7_from[k], flat_pattern3_7_to[k]) for k in range(2)], Face(Wire(flat_pattern3_7_from)), Face(Wire(flat_pattern3_7_to))]))
    add(flat_pattern3_7, mode=Mode.SUBTRACT)

    # Flat-Pattern3 8: loft between two sections, ruled curve by curve
    flat_pattern3_8_from = [
        Edge.make_three_point_arc((-26.5875, 23.47722, -6.36651), (-26.5875, 21.84527, -7.99846), (-26.5875, 23.47722, -9.63041)),
        Edge.make_three_point_arc((-26.5875, 23.47722, -9.63041), (-26.5875, 25.10917, -7.99846), (-26.5875, 23.47722, -6.36651)),
    ]
    flat_pattern3_8_to = [
        Edge.make_three_point_arc((-25, 23.47722, -6.36651), (-25, 21.84527, -7.99846), (-25, 23.47722, -9.63041)),
        Edge.make_three_point_arc((-25, 23.47722, -9.63041), (-25, 25.10917, -7.99846), (-25, 23.47722, -6.36651)),
    ]
    flat_pattern3_8 = Solid(Shell([*[Face.make_surface_from_curves(flat_pattern3_8_from[k], flat_pattern3_8_to[k]) for k in range(2)], Face(Wire(flat_pattern3_8_from)), Face(Wire(flat_pattern3_8_to))]))
    add(flat_pattern3_8, mode=Mode.SUBTRACT)

    # Flat-Pattern3 9: loft between two sections, ruled curve by curve
    flat_pattern3_9_from = [
        Edge.make_three_point_arc((-26.5875, 22.97811, 21.88337), (-26.5875, 21.34616, 20.25142), (-26.5875, 22.97811, 18.61947)),
        Edge.make_three_point_arc((-26.5875, 22.97811, 18.61947), (-26.5875, 24.61006, 20.25142), (-26.5875, 22.97811, 21.88337)),
    ]
    flat_pattern3_9_to = [
        Edge.make_three_point_arc((-25, 22.97811, 21.88337), (-25, 21.34616, 20.25142), (-25, 22.97811, 18.61947)),
        Edge.make_three_point_arc((-25, 22.97811, 18.61947), (-25, 24.61006, 20.25142), (-25, 22.97811, 21.88337)),
    ]
    flat_pattern3_9 = Solid(Shell([*[Face.make_surface_from_curves(flat_pattern3_9_from[k], flat_pattern3_9_to[k]) for k in range(2)], Face(Wire(flat_pattern3_9_from)), Face(Wire(flat_pattern3_9_to))]))
    add(flat_pattern3_9, mode=Mode.SUBTRACT)

    # Flat-Pattern3 10: loft between two sections, ruled curve by curve
    flat_pattern3_10_from = [
        Edge.make_three_point_arc((-26.5875, 5.97789, 21.88337), (-26.5875, 4.34594, 20.25142), (-26.5875, 5.97789, 18.61947)),
        Edge.make_three_point_arc((-26.5875, 5.97789, 18.61947), (-26.5875, 7.60984, 20.25142), (-26.5875, 5.97789, 21.88337)),
    ]
    flat_pattern3_10_to = [
        Edge.make_three_point_arc((-25, 5.97789, 21.88337), (-25, 4.34594, 20.25142), (-25, 5.97789, 18.61947)),
        Edge.make_three_point_arc((-25, 5.97789, 18.61947), (-25, 7.60984, 20.25142), (-25, 5.97789, 21.88337)),
    ]
    flat_pattern3_10 = Solid(Shell([*[Face.make_surface_from_curves(flat_pattern3_10_from[k], flat_pattern3_10_to[k]) for k in range(2)], Face(Wire(flat_pattern3_10_from)), Face(Wire(flat_pattern3_10_to))]))
    add(flat_pattern3_10, mode=Mode.SUBTRACT)

    # Flat-Pattern3 11: loft between two sections, ruled curve by curve
    flat_pattern3_11_from = [
        Edge.make_three_point_arc((-26.5875, 5.47878, -6.36651), (-26.5875, 3.84683, -7.99846), (-26.5875, 5.47878, -9.63041)),
        Edge.make_three_point_arc((-26.5875, 5.47878, -9.63041), (-26.5875, 7.11073, -7.99846), (-26.5875, 5.47878, -6.36651)),
    ]
    flat_pattern3_11_to = [
        Edge.make_three_point_arc((-25, 5.47878, -6.36651), (-25, 3.84683, -7.99846), (-25, 5.47878, -9.63041)),
        Edge.make_three_point_arc((-25, 5.47878, -9.63041), (-25, 7.11073, -7.99846), (-25, 5.47878, -6.36651)),
    ]
    flat_pattern3_11 = Solid(Shell([*[Face.make_surface_from_curves(flat_pattern3_11_from[k], flat_pattern3_11_to[k]) for k in range(2)], Face(Wire(flat_pattern3_11_from)), Face(Wire(flat_pattern3_11_to))]))
    add(flat_pattern3_11, mode=Mode.SUBTRACT)

    # Flat-Pattern3 12: loft between two sections, ruled curve by curve
    flat_pattern3_12_from = [
        Edge.make_three_point_arc((34.0875, 50, 19.13195), (35.71945, 50, 17.5), (34.0875, 50, 15.86805)),
        Edge.make_three_point_arc((34.0875, 50, 15.86805), (32.45555, 50, 17.5), (34.0875, 50, 19.13195)),
    ]
    flat_pattern3_12_to = [
        Edge.make_three_point_arc((34.0875, 51.5875, 19.13195), (35.71945, 51.5875, 17.5), (34.0875, 51.5875, 15.86805)),
        Edge.make_three_point_arc((34.0875, 51.5875, 15.86805), (32.45555, 51.5875, 17.5), (34.0875, 51.5875, 19.13195)),
    ]
    flat_pattern3_12 = Solid(Shell([*[Face.make_surface_from_curves(flat_pattern3_12_from[k], flat_pattern3_12_to[k]) for k in range(2)], Face(Wire(flat_pattern3_12_from)), Face(Wire(flat_pattern3_12_to))]))
    add(flat_pattern3_12, mode=Mode.SUBTRACT)

    # Flat-Pattern3 13: loft between two sections, ruled curve by curve
    flat_pattern3_13_from = [
        Edge.make_three_point_arc((34.0875, 50, -15.86805), (35.71945, 50, -17.5), (34.0875, 50, -19.13195)),
        Edge.make_three_point_arc((34.0875, 50, -19.13195), (32.45555, 50, -17.5), (34.0875, 50, -15.86805)),
    ]
    flat_pattern3_13_to = [
        Edge.make_three_point_arc((34.0875, 51.5875, -15.86805), (35.71945, 51.5875, -17.5), (34.0875, 51.5875, -19.13195)),
        Edge.make_three_point_arc((34.0875, 51.5875, -19.13195), (32.45555, 51.5875, -17.5), (34.0875, 51.5875, -15.86805)),
    ]
    flat_pattern3_13 = Solid(Shell([*[Face.make_surface_from_curves(flat_pattern3_13_from[k], flat_pattern3_13_to[k]) for k in range(2)], Face(Wire(flat_pattern3_13_from)), Face(Wire(flat_pattern3_13_to))]))
    add(flat_pattern3_13, mode=Mode.SUBTRACT)

    # Flat-Pattern3 14: loft between two sections, ruled curve by curve
    flat_pattern3_14_from = [
        Edge.make_three_point_arc((25, 16.978, -12.19708), (25, 14.478, -9.69708), (25, 11.978, -12.19708)),
        Edge.make_three_point_arc((25, 11.978, -12.19708), (25, 14.478, -14.69708), (25, 16.978, -12.19708)),
    ]
    flat_pattern3_14_to = [
        Edge.make_three_point_arc((26.5875, 16.978, -12.19708), (26.5875, 14.478, -9.69708), (26.5875, 11.978, -12.19708)),
        Edge.make_three_point_arc((26.5875, 11.978, -12.19708), (26.5875, 14.478, -14.69708), (26.5875, 16.978, -12.19708)),
    ]
    flat_pattern3_14 = Solid(Shell([*[Face.make_surface_from_curves(flat_pattern3_14_from[k], flat_pattern3_14_to[k]) for k in range(2)], Face(Wire(flat_pattern3_14_from)), Face(Wire(flat_pattern3_14_to))]))
    add(flat_pattern3_14, mode=Mode.SUBTRACT)

    # Flat-Pattern3 15: loft between two sections, ruled curve by curve
    flat_pattern3_15_from = [
        Edge.make_three_point_arc((26.5875, 5.47878, 9.63041), (26.5875, 7.11073, 7.99846), (26.5875, 5.47878, 6.36651)),
        Edge.make_three_point_arc((26.5875, 5.47878, 6.36651), (26.5875, 3.84683, 7.99846), (26.5875, 5.47878, 9.63041)),
    ]
    flat_pattern3_15_to = [
        Edge.make_three_point_arc((25, 5.47878, 9.63041), (25, 7.11073, 7.99846), (25, 5.47878, 6.36651)),
        Edge.make_three_point_arc((25, 5.47878, 6.36651), (25, 3.84683, 7.99846), (25, 5.47878, 9.63041)),
    ]
    flat_pattern3_15 = Solid(Shell([*[Face.make_surface_from_curves(flat_pattern3_15_from[k], flat_pattern3_15_to[k]) for k in range(2)], Face(Wire(flat_pattern3_15_from)), Face(Wire(flat_pattern3_15_to))]))
    add(flat_pattern3_15, mode=Mode.SUBTRACT)

    # Flat-Pattern3 16: loft between two sections, ruled curve by curve
    flat_pattern3_16_from = [
        Edge.make_three_point_arc((26.5875, 23.47722, 9.63041), (26.5875, 25.10917, 7.99846), (26.5875, 23.47722, 6.36651)),
        Edge.make_three_point_arc((26.5875, 23.47722, 6.36651), (26.5875, 21.84527, 7.99846), (26.5875, 23.47722, 9.63041)),
    ]
    flat_pattern3_16_to = [
        Edge.make_three_point_arc((25, 23.47722, 9.63041), (25, 25.10917, 7.99846), (25, 23.47722, 6.36651)),
        Edge.make_three_point_arc((25, 23.47722, 6.36651), (25, 21.84527, 7.99846), (25, 23.47722, 9.63041)),
    ]
    flat_pattern3_16 = Solid(Shell([*[Face.make_surface_from_curves(flat_pattern3_16_from[k], flat_pattern3_16_to[k]) for k in range(2)], Face(Wire(flat_pattern3_16_from)), Face(Wire(flat_pattern3_16_to))]))
    add(flat_pattern3_16, mode=Mode.SUBTRACT)

    # Flat-Pattern3 17: loft between two sections, ruled curve by curve
    flat_pattern3_17_from = [
        Edge.make_three_point_arc((26.5875, 22.97811, -18.61947), (26.5875, 24.61006, -20.25142), (26.5875, 22.97811, -21.88337)),
        Edge.make_three_point_arc((26.5875, 22.97811, -21.88337), (26.5875, 21.34616, -20.25142), (26.5875, 22.97811, -18.61947)),
    ]
    flat_pattern3_17_to = [
        Edge.make_three_point_arc((25, 22.97811, -18.61947), (25, 24.61006, -20.25142), (25, 22.97811, -21.88337)),
        Edge.make_three_point_arc((25, 22.97811, -21.88337), (25, 21.34616, -20.25142), (25, 22.97811, -18.61947)),
    ]
    flat_pattern3_17 = Solid(Shell([*[Face.make_surface_from_curves(flat_pattern3_17_from[k], flat_pattern3_17_to[k]) for k in range(2)], Face(Wire(flat_pattern3_17_from)), Face(Wire(flat_pattern3_17_to))]))
    add(flat_pattern3_17, mode=Mode.SUBTRACT)

    # Flat-Pattern3 18: loft between two sections, ruled curve by curve
    flat_pattern3_18_from = [
        Edge.make_three_point_arc((26.5875, 5.97789, -18.61947), (26.5875, 7.60984, -20.25142), (26.5875, 5.97789, -21.88337)),
        Edge.make_three_point_arc((26.5875, 5.97789, -21.88337), (26.5875, 4.34594, -20.25142), (26.5875, 5.97789, -18.61947)),
    ]
    flat_pattern3_18_to = [
        Edge.make_three_point_arc((25, 5.97789, -18.61947), (25, 7.60984, -20.25142), (25, 5.97789, -21.88337)),
        Edge.make_three_point_arc((25, 5.97789, -21.88337), (25, 4.34594, -20.25142), (25, 5.97789, -18.61947)),
    ]
    flat_pattern3_18 = Solid(Shell([*[Face.make_surface_from_curves(flat_pattern3_18_from[k], flat_pattern3_18_to[k]) for k in range(2)], Face(Wire(flat_pattern3_18_from)), Face(Wire(flat_pattern3_18_to))]))
    add(flat_pattern3_18, mode=Mode.SUBTRACT)


solid = part_1.part
